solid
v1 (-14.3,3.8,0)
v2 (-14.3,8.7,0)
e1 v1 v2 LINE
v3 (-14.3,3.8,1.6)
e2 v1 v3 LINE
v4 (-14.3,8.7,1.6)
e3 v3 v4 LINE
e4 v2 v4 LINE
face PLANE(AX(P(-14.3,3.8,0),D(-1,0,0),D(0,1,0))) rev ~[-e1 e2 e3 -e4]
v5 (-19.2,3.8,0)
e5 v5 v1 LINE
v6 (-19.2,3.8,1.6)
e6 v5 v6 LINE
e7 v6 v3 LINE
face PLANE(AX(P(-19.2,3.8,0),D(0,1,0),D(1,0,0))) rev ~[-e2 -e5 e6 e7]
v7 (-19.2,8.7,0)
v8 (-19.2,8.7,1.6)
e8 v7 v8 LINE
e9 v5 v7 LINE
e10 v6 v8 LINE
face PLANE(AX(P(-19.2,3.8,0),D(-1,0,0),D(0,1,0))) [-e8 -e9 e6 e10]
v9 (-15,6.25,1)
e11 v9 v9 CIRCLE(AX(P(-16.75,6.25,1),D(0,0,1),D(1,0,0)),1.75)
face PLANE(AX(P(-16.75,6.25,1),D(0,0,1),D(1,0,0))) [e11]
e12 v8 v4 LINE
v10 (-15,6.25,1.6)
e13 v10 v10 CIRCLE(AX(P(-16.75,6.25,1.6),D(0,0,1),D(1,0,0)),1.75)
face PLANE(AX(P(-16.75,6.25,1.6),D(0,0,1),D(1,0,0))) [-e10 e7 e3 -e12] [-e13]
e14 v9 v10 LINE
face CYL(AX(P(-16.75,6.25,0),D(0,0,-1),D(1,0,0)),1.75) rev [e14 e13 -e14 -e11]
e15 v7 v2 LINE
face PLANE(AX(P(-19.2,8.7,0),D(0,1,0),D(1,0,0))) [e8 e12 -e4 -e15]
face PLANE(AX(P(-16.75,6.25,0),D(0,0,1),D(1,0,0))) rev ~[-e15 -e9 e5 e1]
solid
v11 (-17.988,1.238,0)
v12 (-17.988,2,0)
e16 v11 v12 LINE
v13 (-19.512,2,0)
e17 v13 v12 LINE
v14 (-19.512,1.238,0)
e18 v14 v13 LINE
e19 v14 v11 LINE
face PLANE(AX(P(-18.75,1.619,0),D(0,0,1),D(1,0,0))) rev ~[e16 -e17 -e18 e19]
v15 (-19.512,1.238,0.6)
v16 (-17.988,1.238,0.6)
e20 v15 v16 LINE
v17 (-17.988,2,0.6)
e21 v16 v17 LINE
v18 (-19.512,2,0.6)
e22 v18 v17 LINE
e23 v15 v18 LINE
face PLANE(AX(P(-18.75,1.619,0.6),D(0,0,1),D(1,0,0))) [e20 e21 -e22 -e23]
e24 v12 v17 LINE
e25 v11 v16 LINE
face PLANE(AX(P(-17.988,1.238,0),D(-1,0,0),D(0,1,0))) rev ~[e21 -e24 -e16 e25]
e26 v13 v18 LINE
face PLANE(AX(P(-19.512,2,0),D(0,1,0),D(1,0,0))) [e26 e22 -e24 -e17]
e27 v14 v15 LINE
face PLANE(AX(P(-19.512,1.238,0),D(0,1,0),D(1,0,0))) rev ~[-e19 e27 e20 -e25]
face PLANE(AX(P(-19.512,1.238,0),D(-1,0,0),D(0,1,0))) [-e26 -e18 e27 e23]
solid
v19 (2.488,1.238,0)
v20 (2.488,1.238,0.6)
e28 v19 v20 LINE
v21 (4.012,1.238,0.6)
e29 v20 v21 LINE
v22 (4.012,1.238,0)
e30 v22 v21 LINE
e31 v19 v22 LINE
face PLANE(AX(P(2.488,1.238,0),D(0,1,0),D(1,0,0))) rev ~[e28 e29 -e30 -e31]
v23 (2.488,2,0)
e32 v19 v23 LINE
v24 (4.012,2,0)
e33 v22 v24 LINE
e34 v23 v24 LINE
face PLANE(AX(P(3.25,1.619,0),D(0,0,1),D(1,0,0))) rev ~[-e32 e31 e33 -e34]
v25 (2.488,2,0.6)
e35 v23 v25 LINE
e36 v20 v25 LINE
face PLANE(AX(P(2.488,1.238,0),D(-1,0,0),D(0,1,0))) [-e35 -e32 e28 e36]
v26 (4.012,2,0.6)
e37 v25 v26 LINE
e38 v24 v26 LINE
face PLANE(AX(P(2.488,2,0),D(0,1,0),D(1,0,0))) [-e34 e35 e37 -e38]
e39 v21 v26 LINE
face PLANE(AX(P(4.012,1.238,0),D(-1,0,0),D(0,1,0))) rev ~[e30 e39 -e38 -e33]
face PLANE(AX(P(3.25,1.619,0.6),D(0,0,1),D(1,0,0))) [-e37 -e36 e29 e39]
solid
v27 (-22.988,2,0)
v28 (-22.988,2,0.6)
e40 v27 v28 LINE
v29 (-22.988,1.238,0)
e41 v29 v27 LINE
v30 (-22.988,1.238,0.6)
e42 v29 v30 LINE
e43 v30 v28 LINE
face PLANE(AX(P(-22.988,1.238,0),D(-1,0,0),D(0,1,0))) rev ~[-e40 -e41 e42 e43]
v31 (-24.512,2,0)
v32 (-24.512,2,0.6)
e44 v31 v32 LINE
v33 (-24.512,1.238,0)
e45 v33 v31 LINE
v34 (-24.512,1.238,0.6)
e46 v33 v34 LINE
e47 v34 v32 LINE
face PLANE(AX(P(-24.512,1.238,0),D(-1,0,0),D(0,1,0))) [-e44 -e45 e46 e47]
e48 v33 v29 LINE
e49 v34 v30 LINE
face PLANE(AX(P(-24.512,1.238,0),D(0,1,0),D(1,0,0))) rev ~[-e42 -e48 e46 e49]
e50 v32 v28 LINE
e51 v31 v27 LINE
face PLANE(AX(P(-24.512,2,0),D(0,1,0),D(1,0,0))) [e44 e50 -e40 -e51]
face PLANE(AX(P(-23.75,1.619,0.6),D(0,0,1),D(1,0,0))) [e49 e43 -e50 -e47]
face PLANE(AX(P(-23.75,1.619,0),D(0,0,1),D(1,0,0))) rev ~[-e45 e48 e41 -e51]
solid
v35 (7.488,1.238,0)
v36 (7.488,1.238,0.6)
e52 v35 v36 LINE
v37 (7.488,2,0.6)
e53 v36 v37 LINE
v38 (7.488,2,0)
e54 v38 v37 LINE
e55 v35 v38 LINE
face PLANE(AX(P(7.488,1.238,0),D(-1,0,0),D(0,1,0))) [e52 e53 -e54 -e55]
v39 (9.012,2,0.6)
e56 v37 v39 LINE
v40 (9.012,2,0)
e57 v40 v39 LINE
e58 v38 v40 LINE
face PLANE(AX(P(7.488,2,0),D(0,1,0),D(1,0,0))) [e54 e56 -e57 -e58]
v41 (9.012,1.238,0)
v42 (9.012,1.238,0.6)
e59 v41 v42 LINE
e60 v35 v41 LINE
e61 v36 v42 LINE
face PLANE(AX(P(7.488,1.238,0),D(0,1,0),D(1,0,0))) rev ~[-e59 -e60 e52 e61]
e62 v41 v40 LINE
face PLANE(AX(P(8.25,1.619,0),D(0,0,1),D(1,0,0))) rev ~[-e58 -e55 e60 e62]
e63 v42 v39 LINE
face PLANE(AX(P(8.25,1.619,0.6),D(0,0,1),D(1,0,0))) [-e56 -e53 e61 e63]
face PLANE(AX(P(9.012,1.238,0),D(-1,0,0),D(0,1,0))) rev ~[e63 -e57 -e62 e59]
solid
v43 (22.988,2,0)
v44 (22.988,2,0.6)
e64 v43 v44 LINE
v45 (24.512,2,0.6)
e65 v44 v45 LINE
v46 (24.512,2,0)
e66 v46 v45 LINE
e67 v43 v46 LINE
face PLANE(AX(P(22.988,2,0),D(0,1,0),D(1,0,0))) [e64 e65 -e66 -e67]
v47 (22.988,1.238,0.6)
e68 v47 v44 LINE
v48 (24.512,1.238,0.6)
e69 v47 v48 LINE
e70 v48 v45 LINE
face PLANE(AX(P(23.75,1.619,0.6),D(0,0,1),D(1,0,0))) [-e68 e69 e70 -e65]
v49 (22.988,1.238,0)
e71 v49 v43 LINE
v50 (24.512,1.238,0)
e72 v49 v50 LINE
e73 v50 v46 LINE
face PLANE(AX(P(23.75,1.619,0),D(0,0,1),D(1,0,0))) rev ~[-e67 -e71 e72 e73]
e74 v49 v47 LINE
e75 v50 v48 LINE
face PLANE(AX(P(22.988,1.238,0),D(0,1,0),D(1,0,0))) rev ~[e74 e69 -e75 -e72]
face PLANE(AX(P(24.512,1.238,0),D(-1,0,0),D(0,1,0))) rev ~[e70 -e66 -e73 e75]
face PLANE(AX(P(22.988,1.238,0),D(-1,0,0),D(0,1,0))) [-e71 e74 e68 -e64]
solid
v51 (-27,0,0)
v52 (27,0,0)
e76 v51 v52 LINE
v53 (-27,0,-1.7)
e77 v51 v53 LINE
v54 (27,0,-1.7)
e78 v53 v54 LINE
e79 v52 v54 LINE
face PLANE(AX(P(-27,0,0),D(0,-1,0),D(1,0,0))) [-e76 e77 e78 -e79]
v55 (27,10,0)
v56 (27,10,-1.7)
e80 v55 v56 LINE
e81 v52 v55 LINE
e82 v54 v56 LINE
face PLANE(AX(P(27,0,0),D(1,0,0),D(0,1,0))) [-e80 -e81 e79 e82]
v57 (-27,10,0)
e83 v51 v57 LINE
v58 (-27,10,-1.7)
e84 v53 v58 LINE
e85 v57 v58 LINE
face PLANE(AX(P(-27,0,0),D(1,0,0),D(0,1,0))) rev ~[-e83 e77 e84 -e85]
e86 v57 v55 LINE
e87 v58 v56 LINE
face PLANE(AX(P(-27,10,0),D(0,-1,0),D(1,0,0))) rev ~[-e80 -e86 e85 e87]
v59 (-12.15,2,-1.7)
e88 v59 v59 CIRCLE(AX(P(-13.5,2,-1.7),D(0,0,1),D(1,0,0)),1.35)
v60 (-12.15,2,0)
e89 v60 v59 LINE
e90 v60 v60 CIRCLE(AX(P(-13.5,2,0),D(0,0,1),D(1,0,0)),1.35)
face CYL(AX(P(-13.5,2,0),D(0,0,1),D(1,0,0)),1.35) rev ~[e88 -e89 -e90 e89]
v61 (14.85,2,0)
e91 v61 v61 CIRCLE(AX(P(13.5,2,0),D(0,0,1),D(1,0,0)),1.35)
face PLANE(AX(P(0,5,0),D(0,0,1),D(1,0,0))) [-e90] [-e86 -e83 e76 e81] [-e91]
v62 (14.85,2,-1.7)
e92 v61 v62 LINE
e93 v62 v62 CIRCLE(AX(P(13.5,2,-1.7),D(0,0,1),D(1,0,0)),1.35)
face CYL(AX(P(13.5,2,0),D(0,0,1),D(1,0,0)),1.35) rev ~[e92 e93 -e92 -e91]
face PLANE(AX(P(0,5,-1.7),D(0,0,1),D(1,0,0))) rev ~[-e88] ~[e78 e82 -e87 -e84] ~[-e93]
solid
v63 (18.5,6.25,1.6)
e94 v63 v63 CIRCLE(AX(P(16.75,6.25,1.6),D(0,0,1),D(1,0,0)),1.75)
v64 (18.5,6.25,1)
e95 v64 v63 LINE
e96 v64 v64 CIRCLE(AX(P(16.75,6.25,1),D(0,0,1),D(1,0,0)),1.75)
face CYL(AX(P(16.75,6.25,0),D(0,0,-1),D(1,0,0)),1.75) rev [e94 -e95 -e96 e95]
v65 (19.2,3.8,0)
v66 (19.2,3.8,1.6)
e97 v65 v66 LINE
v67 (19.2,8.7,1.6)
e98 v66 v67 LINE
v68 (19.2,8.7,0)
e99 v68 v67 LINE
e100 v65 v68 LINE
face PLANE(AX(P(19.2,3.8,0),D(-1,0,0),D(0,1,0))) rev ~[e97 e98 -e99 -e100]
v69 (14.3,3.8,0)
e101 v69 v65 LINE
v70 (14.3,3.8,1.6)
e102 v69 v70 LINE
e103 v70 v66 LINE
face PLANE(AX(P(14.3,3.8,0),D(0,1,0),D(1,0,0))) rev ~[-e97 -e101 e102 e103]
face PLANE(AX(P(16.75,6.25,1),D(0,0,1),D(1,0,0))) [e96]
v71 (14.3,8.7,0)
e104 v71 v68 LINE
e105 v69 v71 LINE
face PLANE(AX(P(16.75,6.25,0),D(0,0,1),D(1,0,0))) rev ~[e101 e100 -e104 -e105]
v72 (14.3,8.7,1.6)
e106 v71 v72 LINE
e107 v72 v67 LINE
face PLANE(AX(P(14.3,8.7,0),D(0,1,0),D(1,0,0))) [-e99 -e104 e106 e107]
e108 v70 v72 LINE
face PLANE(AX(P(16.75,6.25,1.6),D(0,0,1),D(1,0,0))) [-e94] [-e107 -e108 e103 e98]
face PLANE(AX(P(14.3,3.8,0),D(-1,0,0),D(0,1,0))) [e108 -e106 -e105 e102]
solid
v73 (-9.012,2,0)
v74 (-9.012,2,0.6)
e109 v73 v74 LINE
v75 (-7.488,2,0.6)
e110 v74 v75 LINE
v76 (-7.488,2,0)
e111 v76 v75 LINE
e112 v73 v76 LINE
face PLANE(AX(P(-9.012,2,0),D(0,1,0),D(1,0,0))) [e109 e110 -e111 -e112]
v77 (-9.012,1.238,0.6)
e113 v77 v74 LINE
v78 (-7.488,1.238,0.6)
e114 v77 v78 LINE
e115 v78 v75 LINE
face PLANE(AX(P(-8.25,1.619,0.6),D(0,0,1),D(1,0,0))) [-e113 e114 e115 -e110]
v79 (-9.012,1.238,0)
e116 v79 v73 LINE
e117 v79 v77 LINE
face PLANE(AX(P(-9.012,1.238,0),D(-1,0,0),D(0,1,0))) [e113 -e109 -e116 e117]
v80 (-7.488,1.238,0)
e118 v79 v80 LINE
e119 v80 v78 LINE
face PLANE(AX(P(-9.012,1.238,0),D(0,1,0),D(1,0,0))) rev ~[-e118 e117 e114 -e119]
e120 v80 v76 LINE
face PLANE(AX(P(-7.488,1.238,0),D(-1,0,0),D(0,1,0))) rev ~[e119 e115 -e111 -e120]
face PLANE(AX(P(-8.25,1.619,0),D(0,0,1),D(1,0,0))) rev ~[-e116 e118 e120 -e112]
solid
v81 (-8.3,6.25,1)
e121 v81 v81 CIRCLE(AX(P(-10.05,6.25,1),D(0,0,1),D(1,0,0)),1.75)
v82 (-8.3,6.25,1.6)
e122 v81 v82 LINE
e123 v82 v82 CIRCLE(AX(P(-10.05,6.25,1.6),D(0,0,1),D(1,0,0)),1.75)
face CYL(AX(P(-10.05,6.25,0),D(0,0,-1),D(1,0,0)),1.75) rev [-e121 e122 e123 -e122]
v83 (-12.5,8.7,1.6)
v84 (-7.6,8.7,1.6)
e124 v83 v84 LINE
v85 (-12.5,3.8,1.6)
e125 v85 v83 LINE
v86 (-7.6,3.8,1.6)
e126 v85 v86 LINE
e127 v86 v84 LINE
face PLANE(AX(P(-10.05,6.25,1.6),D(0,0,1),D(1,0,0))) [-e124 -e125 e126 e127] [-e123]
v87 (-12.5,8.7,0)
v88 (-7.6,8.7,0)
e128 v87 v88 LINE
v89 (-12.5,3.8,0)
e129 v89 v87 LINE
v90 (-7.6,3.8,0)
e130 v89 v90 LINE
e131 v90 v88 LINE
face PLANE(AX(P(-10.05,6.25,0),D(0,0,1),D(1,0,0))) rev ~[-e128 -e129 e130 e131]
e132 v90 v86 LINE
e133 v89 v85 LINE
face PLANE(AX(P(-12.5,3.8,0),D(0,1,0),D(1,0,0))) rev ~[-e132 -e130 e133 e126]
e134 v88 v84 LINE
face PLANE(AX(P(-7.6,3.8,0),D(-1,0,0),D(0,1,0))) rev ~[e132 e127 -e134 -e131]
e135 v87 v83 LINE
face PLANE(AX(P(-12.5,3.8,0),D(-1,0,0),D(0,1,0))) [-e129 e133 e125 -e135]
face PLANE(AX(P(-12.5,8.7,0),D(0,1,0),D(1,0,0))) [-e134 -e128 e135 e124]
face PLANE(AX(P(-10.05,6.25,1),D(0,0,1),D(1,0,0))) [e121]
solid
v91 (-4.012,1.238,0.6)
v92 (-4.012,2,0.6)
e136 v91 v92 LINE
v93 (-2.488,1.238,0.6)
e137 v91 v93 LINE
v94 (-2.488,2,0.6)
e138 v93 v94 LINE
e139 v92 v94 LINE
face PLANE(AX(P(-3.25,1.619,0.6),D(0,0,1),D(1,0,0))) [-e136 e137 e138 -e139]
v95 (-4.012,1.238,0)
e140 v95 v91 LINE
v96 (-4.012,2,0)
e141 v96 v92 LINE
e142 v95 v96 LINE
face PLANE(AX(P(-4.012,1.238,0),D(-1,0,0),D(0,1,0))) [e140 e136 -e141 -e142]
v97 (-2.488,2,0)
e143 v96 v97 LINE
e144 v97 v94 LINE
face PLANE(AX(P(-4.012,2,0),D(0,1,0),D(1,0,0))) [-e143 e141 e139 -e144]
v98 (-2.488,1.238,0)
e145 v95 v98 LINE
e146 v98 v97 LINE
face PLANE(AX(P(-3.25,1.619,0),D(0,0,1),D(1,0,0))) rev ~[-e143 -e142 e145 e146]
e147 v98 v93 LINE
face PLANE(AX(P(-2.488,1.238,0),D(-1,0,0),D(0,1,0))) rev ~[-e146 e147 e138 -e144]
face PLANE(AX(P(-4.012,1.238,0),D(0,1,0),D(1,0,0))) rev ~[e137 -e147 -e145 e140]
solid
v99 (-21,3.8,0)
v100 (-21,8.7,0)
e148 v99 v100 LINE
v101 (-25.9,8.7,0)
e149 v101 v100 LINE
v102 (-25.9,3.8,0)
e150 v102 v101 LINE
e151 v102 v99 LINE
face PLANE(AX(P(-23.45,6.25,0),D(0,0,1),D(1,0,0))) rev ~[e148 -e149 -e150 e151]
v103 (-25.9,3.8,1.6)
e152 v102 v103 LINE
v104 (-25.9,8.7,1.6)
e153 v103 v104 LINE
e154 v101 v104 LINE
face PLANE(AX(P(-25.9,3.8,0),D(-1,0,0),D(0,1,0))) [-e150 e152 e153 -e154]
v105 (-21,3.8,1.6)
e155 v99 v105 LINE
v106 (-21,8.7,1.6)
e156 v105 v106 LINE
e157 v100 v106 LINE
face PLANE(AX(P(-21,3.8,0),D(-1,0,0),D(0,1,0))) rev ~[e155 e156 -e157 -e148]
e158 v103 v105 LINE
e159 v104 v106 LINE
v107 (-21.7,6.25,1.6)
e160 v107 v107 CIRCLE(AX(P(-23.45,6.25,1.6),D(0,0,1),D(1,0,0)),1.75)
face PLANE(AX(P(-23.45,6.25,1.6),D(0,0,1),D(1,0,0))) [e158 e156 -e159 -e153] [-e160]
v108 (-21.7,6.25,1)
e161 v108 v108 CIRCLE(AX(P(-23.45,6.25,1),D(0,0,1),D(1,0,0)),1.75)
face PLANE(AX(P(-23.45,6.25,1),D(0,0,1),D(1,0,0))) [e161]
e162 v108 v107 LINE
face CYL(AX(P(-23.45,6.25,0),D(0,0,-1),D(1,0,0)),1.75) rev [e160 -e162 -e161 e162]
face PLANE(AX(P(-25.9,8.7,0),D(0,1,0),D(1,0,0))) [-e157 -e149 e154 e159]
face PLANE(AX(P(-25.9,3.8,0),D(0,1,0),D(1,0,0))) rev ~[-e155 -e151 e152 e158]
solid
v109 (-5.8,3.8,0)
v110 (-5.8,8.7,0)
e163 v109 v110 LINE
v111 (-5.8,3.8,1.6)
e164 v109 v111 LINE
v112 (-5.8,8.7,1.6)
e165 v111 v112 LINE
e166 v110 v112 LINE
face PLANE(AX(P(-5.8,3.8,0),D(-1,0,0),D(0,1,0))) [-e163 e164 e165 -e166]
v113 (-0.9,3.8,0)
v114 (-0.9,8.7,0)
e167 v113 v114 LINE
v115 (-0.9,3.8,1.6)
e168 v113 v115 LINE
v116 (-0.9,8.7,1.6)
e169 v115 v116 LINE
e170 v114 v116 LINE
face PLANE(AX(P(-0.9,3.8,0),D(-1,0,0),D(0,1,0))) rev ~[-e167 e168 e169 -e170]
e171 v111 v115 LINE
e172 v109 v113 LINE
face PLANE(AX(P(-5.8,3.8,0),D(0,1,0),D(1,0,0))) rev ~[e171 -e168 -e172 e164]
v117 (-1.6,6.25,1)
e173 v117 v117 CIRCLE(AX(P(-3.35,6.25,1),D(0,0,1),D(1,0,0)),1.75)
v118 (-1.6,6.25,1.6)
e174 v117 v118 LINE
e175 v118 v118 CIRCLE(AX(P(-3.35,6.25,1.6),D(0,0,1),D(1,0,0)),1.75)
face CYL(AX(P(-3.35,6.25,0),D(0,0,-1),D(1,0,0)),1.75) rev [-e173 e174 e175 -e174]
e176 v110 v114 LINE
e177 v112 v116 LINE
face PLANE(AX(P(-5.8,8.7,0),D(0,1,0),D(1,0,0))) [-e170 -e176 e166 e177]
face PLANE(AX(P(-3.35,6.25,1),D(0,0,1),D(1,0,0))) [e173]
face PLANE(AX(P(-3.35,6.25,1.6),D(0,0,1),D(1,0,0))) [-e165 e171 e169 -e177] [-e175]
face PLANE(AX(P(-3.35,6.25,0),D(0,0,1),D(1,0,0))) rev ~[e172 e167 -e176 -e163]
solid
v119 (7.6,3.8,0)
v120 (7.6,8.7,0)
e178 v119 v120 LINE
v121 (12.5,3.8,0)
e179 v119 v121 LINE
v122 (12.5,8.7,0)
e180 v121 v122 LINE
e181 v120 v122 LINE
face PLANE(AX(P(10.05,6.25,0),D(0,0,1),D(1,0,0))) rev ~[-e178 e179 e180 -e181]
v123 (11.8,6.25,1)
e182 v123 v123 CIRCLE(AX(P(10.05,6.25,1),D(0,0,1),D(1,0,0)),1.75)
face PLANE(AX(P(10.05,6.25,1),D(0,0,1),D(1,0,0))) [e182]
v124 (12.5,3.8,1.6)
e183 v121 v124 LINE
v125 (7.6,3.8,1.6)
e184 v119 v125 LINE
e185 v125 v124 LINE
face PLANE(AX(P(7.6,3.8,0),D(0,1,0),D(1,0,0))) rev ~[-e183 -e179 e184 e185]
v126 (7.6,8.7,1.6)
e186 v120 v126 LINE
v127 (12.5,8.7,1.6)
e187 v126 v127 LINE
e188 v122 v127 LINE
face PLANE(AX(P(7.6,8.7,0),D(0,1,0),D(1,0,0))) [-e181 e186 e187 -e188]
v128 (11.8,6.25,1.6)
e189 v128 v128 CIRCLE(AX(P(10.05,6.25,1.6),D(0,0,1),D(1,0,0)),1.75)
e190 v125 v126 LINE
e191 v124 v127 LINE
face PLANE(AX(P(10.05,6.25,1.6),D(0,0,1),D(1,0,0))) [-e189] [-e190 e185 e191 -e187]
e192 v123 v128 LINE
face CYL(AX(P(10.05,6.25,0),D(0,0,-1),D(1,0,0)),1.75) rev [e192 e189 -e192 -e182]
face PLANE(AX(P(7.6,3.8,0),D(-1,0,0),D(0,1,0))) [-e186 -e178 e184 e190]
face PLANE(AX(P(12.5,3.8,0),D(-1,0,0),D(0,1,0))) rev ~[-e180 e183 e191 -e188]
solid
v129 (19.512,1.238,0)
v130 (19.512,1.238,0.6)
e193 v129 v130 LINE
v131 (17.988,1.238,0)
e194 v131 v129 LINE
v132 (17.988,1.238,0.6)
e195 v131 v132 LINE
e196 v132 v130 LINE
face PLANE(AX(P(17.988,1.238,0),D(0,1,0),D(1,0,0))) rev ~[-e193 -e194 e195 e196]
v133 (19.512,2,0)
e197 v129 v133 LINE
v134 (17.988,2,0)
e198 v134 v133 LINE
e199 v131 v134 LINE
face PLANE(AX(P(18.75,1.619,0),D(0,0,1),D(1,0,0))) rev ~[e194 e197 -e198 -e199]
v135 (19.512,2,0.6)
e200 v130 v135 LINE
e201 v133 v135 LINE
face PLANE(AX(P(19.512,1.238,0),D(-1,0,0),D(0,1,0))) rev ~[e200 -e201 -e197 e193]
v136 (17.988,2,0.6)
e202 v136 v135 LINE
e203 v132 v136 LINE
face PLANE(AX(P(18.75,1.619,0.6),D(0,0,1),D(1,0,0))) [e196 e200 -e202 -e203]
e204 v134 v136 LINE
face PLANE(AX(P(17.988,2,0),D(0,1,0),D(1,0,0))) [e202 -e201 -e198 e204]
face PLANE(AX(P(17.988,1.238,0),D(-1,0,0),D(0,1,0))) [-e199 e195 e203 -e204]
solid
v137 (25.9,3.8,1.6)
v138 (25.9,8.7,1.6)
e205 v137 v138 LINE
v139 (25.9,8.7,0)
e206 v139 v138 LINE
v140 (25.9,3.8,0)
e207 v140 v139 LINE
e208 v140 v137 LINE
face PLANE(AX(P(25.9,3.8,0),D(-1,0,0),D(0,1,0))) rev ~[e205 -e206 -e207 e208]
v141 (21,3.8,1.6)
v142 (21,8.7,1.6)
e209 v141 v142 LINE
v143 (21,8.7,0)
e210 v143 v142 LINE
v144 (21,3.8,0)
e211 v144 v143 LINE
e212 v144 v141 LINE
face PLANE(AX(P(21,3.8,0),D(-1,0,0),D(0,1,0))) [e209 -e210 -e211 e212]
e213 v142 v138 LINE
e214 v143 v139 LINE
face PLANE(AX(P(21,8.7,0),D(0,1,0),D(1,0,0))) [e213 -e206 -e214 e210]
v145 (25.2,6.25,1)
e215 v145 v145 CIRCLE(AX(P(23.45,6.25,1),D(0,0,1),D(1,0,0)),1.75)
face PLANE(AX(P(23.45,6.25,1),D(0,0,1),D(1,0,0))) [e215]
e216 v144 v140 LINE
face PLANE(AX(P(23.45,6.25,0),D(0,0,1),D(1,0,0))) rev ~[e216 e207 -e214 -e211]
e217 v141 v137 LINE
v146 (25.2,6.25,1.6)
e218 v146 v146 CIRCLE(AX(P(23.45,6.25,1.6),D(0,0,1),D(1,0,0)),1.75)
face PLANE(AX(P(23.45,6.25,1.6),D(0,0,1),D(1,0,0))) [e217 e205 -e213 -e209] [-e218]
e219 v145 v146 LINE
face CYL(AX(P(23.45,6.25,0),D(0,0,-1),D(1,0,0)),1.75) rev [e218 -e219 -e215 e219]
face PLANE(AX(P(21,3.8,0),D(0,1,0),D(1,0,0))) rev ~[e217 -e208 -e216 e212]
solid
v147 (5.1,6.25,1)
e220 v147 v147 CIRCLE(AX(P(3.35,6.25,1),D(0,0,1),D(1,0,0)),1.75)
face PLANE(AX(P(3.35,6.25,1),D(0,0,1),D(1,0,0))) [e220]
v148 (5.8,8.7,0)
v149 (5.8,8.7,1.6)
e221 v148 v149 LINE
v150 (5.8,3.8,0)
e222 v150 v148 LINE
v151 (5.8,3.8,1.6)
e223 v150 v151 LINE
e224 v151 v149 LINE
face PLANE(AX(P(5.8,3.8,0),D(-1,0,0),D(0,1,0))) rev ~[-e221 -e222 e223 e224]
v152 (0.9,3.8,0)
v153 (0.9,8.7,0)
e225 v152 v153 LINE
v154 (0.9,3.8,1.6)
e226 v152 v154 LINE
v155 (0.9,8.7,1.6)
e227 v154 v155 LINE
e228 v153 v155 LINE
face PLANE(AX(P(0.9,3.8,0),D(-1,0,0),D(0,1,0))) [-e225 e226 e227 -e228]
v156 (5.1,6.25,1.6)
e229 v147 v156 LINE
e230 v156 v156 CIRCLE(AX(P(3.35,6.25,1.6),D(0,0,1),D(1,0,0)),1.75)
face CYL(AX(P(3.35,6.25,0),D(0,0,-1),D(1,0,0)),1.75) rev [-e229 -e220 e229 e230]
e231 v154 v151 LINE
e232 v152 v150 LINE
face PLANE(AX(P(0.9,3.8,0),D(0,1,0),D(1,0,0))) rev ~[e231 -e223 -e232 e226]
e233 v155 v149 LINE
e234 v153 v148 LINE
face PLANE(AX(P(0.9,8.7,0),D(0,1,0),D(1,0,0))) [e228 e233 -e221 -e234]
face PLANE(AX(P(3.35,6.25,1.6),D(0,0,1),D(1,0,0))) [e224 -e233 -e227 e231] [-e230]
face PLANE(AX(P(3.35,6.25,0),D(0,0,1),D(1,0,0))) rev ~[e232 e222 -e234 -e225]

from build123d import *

# Parameters (mm, degrees)
F0_W     = 54
F0_H     = 10
F0_R     = 1.35
F2_DEPTH = 1.7
F1_W     = 4.9
F1_H     = 4.9
F1_R     = 1.75
F3_DEPTH = 1.6
F4_DEPTH = 1
F1_W_2   = 1.524
F1_H_2   = 0.762
F5_DEPTH = 0.6


with BuildPart() as f2:
    # F0 (on Top) → F2 (new body)
    with BuildSketch(Plane.XY):
        with Locations((0, 5)):
            Rectangle(F0_W, F0_H)
        with Locations((-13.5, 2)):
            Circle(F0_R, mode=Mode.SUBTRACT)
        with Locations((13.5, 2)):
            Circle(F0_R, mode=Mode.SUBTRACT)
    extrude(amount=-F2_DEPTH)


with BuildPart() as f3:
    # F1 (on Top) → F3 (new body)
    with BuildSketch(Plane.XY):
        with Locations((-23.45, 6.25)):
            Rectangle(F1_W, F1_H)
        with Locations((-23.45, 6.25)):
            Circle(F1_R, mode=Mode.SUBTRACT)
    extrude(amount=F3_DEPTH)

    # F1 (on Top) → F4, piece 8 (join)
    with BuildSketch(Plane.XY):
        with Locations((-23.45, 6.25)):
            Circle(F1_R)
    extrude(amount=F4_DEPTH)


with BuildPart() as f3b:
    # F1 (on Top) → F3, piece 2 (new body)
    with BuildSketch(Plane.XY):
        with Locations((-16.75, 6.25)):
            Rectangle(F1_W, F1_H)
        with Locations((-16.75, 6.25)):
            Circle(F1_R, mode=Mode.SUBTRACT)
    extrude(amount=F3_DEPTH)

    # F1 (on Top) → F4, piece 7 (join)
    with BuildSketch(Plane.XY):
        with Locations((-16.75, 6.25)):
            Circle(F1_R)
    extrude(amount=F4_DEPTH)


with BuildPart() as f3c:
    # F1 (on Top) → F3, piece 3 (new body)
    with BuildSketch(Plane.XY):
        with Locations((-10.05, 6.25)):
            Rectangle(F1_W, F1_H)
        with Locations((-10.05, 6.25)):
            Circle(F1_R, mode=Mode.SUBTRACT)
    extrude(amount=F3_DEPTH)

    # F1 (on Top) → F4, piece 6 (join)
    with BuildSketch(Plane.XY):
        with Locations((-10.05, 6.25)):
            Circle(F1_R)
    extrude(amount=F4_DEPTH)


with BuildPart() as f3d:
    # F1 (on Top) → F3, piece 4 (new body)
    with BuildSketch(Plane.XY):
        with Locations((-3.35, 6.25)):
            Rectangle(F1_W, F1_H)
        with Locations((-3.35, 6.25)):
            Circle(F1_R, mode=Mode.SUBTRACT)
    extrude(amount=F3_DEPTH)

    # F1 (on Top) → F4, piece 5 (join)
    with BuildSketch(Plane.XY):
        with Locations((-3.35, 6.25)):
            Circle(F1_R)
    extrude(amount=F4_DEPTH)


with BuildPart() as f3e:
    # F1 (on Top) → F3, piece 5 (new body)
    with BuildSketch(Plane.XY):
        with Locations((3.35, 6.25)):
            Rectangle(F1_W, F1_H)
        with Locations((3.35, 6.25)):
            Circle(F1_R, mode=Mode.SUBTRACT)
    extrude(amount=F3_DEPTH)

    # F1 (on Top) → F4, piece 4 (join)
    with BuildSketch(Plane.XY):
        with Locations((3.35, 6.25)):
            Circle(F1_R)
    extrude(amount=F4_DEPTH)


with BuildPart() as f3f:
    # F1 (on Top) → F3, piece 6 (new body)
    with BuildSketch(Plane.XY):
        with Locations((10.05, 6.25)):
            Rectangle(F1_W, F1_H)
        with Locations((10.05, 6.25)):
            Circle(F1_R, mode=Mode.SUBTRACT)
    extrude(amount=F3_DEPTH)

    # F1 (on Top) → F4, piece 3 (join)
    with BuildSketch(Plane.XY):
        with Locations((10.05, 6.25)):
            Circle(F1_R)
    extrude(amount=F4_DEPTH)


with BuildPart() as f3g:
    # F1 (on Top) → F3, piece 7 (new body)
    with BuildSketch(Plane.XY):
        with Locations((16.75, 6.25)):
            Rectangle(F1_W, F1_H)
        with Locations((16.75, 6.25)):
            Circle(F1_R, mode=Mode.SUBTRACT)
    extrude(amount=F3_DEPTH)

    # F1 (on Top) → F4, piece 2 (join)
    with BuildSketch(Plane.XY):
        with Locations((16.75, 6.25)):
            Circle(F1_R)
    extrude(amount=F4_DEPTH)


with BuildPart() as f3h:
    # F1 (on Top) → F3, piece 8 (new body)
    with BuildSketch(Plane.XY):
        with Locations((23.45, 6.25)):
            Rectangle(F1_W, F1_H)
        with Locations((23.45, 6.25)):
            Circle(F1_R, mode=Mode.SUBTRACT)
    extrude(amount=F3_DEPTH)

    # F1 (on Top) → F4 (join)
    with BuildSketch(Plane.XY):
        with Locations((23.45, 6.25)):
            Circle(F1_R)
    extrude(amount=F4_DEPTH)


with BuildPart() as f5:
    # F1 (on Top) → F5 (new body)
    with BuildSketch(Plane.XY):
        with Locations((23.75, 1.619)):
            Rectangle(F1_W_2, F1_H_2)
    extrude(amount=F5_DEPTH)


with BuildPart() as f5b:
    # F1 (on Top) → F5, piece 2 (new body)
    with BuildSketch(Plane.XY):
        with Locations((18.75, 1.619)):
            Rectangle(F1_W_2, F1_H_2)
    extrude(amount=F5_DEPTH)


with BuildPart() as f5c:
    # F1 (on Top) → F5, piece 3 (new body)
    with BuildSketch(Plane.XY):
        with Locations((8.25, 1.619)):
            Rectangle(F1_W_2, F1_H_2)
    extrude(amount=F5_DEPTH)


with BuildPart() as f5d:
    # F1 (on Top) → F5, piece 4 (new body)
    with BuildSketch(Plane.XY):
        with Locations((3.25, 1.619)):
            Rectangle(F1_W_2, F1_H_2)
    extrude(amount=F5_DEPTH)


with BuildPart() as f5e:
    # F1 (on Top) → F5, piece 5 (new body)
    with BuildSketch(Plane.XY):
        with Locations((-3.25, 1.619)):
            Rectangle(F1_W_2, F1_H_2)
    extrude(amount=F5_DEPTH)


with BuildPart() as f5f:
    # F1 (on Top) → F5, piece 6 (new body)
    with BuildSketch(Plane.XY):
        with Locations((-8.25, 1.619)):
            Rectangle(F1_W_2, F1_H_2)
    extrude(amount=F5_DEPTH)


with BuildPart() as f5g:
    # F1 (on Top) → F5, piece 7 (new body)
    with BuildSketch(Plane.XY):
        with Locations((-18.75, 1.619)):
            Rectangle(F1_W_2, F1_H_2)
    extrude(amount=F5_DEPTH)


with BuildPart() as f5h:
    # F1 (on Top) → F5, piece 8 (new body)
    with BuildSketch(Plane.XY):
        with Locations((-23.75, 1.619)):
            Rectangle(F1_W_2, F1_H_2)
    extrude(amount=F5_DEPTH)


solid = Compound([f2.part, f3.part, f3b.part, f3c.part, f3d.part, f3e.part, f3f.part, f3g.part, f3h.part, f5.part, f5b.part, f5c.part, f5d.part, f5e.part, f5f.part, f5g.part, f5h.part])
